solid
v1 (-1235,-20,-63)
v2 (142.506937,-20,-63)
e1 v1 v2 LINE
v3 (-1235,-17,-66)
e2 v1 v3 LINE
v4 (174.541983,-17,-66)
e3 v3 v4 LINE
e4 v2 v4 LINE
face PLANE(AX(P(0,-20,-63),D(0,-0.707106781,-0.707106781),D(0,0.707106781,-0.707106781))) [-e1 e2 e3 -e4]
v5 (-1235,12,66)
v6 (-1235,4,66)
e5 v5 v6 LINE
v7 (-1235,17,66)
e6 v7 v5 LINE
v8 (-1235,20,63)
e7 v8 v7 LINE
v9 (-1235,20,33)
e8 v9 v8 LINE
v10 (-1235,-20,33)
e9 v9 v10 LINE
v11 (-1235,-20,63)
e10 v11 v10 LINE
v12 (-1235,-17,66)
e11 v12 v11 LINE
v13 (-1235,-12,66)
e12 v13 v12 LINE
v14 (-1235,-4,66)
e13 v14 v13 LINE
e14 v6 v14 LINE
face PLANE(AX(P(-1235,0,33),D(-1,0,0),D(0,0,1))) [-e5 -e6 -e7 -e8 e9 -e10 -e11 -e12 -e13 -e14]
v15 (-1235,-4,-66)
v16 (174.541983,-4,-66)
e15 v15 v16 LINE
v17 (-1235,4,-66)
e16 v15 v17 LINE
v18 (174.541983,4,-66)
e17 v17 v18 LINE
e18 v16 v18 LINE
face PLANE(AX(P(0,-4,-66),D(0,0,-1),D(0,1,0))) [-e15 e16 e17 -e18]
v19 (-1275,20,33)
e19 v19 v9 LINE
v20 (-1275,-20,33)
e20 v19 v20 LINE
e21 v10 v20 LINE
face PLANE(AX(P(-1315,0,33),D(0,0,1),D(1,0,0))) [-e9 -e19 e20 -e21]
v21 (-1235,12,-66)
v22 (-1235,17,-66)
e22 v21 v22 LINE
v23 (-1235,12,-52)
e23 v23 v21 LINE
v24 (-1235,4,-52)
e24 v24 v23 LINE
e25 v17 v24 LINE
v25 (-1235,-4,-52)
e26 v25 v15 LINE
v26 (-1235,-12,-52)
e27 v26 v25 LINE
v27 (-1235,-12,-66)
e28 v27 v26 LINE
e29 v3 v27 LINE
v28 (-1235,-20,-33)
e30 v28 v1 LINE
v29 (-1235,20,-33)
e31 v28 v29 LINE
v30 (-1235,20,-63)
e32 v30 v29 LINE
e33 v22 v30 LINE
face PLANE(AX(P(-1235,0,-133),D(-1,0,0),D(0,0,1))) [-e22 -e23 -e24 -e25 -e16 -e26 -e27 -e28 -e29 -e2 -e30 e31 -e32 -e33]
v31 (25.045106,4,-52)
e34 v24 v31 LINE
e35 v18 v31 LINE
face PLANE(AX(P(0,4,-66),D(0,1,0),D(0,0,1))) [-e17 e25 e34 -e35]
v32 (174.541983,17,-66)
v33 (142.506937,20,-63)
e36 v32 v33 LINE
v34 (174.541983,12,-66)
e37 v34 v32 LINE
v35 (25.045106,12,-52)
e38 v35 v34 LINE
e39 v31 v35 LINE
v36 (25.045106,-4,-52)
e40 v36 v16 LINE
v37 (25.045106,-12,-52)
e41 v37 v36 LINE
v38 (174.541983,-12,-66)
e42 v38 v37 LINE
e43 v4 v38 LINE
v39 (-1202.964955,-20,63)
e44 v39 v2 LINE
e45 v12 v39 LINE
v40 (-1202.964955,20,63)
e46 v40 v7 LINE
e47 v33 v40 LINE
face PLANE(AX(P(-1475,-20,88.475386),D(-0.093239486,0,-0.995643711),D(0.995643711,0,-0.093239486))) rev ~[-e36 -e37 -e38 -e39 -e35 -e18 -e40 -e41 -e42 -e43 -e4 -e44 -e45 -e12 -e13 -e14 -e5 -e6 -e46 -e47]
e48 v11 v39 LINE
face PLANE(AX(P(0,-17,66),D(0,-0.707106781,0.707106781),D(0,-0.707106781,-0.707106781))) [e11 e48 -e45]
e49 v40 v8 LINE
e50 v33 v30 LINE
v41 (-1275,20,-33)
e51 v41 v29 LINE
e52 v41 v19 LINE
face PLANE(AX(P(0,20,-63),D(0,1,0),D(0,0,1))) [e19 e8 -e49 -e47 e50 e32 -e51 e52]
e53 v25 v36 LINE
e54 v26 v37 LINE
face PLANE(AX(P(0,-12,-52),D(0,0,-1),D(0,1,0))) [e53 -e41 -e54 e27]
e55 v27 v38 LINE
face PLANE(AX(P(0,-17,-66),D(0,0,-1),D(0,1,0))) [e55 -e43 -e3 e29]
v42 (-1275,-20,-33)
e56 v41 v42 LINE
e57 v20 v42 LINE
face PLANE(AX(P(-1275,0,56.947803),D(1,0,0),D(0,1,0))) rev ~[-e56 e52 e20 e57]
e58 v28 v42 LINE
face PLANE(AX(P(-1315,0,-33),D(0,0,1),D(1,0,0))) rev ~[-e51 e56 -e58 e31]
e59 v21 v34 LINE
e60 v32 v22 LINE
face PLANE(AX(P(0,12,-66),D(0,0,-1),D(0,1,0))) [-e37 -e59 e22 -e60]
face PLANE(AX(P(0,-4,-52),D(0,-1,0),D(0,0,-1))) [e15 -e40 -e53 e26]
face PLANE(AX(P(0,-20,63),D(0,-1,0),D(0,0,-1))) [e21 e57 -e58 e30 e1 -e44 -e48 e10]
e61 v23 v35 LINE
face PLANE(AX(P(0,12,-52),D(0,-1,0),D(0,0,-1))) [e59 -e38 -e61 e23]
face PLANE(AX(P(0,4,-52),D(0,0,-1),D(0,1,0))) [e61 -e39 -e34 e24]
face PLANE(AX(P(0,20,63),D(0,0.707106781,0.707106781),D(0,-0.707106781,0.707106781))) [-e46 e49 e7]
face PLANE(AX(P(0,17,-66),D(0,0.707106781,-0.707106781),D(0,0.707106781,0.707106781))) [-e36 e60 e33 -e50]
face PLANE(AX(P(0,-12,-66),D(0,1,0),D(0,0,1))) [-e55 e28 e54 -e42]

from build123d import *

# Parameters (mm, degrees)
F1_W     = 40
F1_H     = 33
F3_DEPTH = 1275
F2_W     = 80
F2_H     = 100
F4_DEPTH = 25
F6_DEPTH = 50


with BuildPart() as f3:
    # F1 (on Right) → F3 (new body, symmetric)
    with BuildSketch(Plane.YZ):
        Polygon((20, 33), (20, 63), (17, 66), (12, 66), (12, 80), (4, 80), (4, 66), (-4, 66), (-4, 80), (-12, 80), (-12, 66), (-17, 66), (-20, 63), (-20, 33), align=None)
        with Locations((0, 16.5)):
            Rectangle(F1_W, F1_H)
        with Locations((0, -16.5)):
            Rectangle(F1_W, F1_H)
        Polygon((20, -63), (20, -33), (-20, -33), (-20, -63), (-17, -66), (-12, -66), (-12, -52), (-4, -52), (-4, -66), (4, -66), (4, -52), (12, -52), (12, -66), (17, -66), align=None)
    extrude(amount=F3_DEPTH, both=True)

    # F2 (on Front) → F4 (cut, symmetric)
    with BuildSketch(Plane.XZ):
        with Locations((-1275, 83)):
            Rectangle(F2_W, F2_H)
        with Locations((-1275, -83)):
            Rectangle(F2_W, F2_H)
        with Locations((1275, 83)):
            Rectangle(F2_W, F2_H)
        with Locations((1275, -83)):
            Rectangle(F2_W, F2_H)
    extrude(amount=F4_DEPTH, both=True, mode=Mode.SUBTRACT)

    # F5 (on face) → F6 (cut, symmetric)
    with BuildSketch(Plane.XZ.offset(20)):
        Polygon((1525, 88.4753859), (-1475, 88.4753859), (-1202.9649549421, 63), (1235, 63), (1235, 33), (1275, 33), (1275, -33), (1235, -33), (1235, -63), (142.5069374912, -63), (1525, -192.4669378497), align=None)
        Polygon((1235, 63), (-1202.9649549421, 63), (142.5069374912, -63), (1235, -63), (1235, -33), (1275, -33), (1275, 33), (1235, 33), align=None)
    extrude(amount=F6_DEPTH, both=True, mode=Mode.SUBTRACT)


solid = f3.part
